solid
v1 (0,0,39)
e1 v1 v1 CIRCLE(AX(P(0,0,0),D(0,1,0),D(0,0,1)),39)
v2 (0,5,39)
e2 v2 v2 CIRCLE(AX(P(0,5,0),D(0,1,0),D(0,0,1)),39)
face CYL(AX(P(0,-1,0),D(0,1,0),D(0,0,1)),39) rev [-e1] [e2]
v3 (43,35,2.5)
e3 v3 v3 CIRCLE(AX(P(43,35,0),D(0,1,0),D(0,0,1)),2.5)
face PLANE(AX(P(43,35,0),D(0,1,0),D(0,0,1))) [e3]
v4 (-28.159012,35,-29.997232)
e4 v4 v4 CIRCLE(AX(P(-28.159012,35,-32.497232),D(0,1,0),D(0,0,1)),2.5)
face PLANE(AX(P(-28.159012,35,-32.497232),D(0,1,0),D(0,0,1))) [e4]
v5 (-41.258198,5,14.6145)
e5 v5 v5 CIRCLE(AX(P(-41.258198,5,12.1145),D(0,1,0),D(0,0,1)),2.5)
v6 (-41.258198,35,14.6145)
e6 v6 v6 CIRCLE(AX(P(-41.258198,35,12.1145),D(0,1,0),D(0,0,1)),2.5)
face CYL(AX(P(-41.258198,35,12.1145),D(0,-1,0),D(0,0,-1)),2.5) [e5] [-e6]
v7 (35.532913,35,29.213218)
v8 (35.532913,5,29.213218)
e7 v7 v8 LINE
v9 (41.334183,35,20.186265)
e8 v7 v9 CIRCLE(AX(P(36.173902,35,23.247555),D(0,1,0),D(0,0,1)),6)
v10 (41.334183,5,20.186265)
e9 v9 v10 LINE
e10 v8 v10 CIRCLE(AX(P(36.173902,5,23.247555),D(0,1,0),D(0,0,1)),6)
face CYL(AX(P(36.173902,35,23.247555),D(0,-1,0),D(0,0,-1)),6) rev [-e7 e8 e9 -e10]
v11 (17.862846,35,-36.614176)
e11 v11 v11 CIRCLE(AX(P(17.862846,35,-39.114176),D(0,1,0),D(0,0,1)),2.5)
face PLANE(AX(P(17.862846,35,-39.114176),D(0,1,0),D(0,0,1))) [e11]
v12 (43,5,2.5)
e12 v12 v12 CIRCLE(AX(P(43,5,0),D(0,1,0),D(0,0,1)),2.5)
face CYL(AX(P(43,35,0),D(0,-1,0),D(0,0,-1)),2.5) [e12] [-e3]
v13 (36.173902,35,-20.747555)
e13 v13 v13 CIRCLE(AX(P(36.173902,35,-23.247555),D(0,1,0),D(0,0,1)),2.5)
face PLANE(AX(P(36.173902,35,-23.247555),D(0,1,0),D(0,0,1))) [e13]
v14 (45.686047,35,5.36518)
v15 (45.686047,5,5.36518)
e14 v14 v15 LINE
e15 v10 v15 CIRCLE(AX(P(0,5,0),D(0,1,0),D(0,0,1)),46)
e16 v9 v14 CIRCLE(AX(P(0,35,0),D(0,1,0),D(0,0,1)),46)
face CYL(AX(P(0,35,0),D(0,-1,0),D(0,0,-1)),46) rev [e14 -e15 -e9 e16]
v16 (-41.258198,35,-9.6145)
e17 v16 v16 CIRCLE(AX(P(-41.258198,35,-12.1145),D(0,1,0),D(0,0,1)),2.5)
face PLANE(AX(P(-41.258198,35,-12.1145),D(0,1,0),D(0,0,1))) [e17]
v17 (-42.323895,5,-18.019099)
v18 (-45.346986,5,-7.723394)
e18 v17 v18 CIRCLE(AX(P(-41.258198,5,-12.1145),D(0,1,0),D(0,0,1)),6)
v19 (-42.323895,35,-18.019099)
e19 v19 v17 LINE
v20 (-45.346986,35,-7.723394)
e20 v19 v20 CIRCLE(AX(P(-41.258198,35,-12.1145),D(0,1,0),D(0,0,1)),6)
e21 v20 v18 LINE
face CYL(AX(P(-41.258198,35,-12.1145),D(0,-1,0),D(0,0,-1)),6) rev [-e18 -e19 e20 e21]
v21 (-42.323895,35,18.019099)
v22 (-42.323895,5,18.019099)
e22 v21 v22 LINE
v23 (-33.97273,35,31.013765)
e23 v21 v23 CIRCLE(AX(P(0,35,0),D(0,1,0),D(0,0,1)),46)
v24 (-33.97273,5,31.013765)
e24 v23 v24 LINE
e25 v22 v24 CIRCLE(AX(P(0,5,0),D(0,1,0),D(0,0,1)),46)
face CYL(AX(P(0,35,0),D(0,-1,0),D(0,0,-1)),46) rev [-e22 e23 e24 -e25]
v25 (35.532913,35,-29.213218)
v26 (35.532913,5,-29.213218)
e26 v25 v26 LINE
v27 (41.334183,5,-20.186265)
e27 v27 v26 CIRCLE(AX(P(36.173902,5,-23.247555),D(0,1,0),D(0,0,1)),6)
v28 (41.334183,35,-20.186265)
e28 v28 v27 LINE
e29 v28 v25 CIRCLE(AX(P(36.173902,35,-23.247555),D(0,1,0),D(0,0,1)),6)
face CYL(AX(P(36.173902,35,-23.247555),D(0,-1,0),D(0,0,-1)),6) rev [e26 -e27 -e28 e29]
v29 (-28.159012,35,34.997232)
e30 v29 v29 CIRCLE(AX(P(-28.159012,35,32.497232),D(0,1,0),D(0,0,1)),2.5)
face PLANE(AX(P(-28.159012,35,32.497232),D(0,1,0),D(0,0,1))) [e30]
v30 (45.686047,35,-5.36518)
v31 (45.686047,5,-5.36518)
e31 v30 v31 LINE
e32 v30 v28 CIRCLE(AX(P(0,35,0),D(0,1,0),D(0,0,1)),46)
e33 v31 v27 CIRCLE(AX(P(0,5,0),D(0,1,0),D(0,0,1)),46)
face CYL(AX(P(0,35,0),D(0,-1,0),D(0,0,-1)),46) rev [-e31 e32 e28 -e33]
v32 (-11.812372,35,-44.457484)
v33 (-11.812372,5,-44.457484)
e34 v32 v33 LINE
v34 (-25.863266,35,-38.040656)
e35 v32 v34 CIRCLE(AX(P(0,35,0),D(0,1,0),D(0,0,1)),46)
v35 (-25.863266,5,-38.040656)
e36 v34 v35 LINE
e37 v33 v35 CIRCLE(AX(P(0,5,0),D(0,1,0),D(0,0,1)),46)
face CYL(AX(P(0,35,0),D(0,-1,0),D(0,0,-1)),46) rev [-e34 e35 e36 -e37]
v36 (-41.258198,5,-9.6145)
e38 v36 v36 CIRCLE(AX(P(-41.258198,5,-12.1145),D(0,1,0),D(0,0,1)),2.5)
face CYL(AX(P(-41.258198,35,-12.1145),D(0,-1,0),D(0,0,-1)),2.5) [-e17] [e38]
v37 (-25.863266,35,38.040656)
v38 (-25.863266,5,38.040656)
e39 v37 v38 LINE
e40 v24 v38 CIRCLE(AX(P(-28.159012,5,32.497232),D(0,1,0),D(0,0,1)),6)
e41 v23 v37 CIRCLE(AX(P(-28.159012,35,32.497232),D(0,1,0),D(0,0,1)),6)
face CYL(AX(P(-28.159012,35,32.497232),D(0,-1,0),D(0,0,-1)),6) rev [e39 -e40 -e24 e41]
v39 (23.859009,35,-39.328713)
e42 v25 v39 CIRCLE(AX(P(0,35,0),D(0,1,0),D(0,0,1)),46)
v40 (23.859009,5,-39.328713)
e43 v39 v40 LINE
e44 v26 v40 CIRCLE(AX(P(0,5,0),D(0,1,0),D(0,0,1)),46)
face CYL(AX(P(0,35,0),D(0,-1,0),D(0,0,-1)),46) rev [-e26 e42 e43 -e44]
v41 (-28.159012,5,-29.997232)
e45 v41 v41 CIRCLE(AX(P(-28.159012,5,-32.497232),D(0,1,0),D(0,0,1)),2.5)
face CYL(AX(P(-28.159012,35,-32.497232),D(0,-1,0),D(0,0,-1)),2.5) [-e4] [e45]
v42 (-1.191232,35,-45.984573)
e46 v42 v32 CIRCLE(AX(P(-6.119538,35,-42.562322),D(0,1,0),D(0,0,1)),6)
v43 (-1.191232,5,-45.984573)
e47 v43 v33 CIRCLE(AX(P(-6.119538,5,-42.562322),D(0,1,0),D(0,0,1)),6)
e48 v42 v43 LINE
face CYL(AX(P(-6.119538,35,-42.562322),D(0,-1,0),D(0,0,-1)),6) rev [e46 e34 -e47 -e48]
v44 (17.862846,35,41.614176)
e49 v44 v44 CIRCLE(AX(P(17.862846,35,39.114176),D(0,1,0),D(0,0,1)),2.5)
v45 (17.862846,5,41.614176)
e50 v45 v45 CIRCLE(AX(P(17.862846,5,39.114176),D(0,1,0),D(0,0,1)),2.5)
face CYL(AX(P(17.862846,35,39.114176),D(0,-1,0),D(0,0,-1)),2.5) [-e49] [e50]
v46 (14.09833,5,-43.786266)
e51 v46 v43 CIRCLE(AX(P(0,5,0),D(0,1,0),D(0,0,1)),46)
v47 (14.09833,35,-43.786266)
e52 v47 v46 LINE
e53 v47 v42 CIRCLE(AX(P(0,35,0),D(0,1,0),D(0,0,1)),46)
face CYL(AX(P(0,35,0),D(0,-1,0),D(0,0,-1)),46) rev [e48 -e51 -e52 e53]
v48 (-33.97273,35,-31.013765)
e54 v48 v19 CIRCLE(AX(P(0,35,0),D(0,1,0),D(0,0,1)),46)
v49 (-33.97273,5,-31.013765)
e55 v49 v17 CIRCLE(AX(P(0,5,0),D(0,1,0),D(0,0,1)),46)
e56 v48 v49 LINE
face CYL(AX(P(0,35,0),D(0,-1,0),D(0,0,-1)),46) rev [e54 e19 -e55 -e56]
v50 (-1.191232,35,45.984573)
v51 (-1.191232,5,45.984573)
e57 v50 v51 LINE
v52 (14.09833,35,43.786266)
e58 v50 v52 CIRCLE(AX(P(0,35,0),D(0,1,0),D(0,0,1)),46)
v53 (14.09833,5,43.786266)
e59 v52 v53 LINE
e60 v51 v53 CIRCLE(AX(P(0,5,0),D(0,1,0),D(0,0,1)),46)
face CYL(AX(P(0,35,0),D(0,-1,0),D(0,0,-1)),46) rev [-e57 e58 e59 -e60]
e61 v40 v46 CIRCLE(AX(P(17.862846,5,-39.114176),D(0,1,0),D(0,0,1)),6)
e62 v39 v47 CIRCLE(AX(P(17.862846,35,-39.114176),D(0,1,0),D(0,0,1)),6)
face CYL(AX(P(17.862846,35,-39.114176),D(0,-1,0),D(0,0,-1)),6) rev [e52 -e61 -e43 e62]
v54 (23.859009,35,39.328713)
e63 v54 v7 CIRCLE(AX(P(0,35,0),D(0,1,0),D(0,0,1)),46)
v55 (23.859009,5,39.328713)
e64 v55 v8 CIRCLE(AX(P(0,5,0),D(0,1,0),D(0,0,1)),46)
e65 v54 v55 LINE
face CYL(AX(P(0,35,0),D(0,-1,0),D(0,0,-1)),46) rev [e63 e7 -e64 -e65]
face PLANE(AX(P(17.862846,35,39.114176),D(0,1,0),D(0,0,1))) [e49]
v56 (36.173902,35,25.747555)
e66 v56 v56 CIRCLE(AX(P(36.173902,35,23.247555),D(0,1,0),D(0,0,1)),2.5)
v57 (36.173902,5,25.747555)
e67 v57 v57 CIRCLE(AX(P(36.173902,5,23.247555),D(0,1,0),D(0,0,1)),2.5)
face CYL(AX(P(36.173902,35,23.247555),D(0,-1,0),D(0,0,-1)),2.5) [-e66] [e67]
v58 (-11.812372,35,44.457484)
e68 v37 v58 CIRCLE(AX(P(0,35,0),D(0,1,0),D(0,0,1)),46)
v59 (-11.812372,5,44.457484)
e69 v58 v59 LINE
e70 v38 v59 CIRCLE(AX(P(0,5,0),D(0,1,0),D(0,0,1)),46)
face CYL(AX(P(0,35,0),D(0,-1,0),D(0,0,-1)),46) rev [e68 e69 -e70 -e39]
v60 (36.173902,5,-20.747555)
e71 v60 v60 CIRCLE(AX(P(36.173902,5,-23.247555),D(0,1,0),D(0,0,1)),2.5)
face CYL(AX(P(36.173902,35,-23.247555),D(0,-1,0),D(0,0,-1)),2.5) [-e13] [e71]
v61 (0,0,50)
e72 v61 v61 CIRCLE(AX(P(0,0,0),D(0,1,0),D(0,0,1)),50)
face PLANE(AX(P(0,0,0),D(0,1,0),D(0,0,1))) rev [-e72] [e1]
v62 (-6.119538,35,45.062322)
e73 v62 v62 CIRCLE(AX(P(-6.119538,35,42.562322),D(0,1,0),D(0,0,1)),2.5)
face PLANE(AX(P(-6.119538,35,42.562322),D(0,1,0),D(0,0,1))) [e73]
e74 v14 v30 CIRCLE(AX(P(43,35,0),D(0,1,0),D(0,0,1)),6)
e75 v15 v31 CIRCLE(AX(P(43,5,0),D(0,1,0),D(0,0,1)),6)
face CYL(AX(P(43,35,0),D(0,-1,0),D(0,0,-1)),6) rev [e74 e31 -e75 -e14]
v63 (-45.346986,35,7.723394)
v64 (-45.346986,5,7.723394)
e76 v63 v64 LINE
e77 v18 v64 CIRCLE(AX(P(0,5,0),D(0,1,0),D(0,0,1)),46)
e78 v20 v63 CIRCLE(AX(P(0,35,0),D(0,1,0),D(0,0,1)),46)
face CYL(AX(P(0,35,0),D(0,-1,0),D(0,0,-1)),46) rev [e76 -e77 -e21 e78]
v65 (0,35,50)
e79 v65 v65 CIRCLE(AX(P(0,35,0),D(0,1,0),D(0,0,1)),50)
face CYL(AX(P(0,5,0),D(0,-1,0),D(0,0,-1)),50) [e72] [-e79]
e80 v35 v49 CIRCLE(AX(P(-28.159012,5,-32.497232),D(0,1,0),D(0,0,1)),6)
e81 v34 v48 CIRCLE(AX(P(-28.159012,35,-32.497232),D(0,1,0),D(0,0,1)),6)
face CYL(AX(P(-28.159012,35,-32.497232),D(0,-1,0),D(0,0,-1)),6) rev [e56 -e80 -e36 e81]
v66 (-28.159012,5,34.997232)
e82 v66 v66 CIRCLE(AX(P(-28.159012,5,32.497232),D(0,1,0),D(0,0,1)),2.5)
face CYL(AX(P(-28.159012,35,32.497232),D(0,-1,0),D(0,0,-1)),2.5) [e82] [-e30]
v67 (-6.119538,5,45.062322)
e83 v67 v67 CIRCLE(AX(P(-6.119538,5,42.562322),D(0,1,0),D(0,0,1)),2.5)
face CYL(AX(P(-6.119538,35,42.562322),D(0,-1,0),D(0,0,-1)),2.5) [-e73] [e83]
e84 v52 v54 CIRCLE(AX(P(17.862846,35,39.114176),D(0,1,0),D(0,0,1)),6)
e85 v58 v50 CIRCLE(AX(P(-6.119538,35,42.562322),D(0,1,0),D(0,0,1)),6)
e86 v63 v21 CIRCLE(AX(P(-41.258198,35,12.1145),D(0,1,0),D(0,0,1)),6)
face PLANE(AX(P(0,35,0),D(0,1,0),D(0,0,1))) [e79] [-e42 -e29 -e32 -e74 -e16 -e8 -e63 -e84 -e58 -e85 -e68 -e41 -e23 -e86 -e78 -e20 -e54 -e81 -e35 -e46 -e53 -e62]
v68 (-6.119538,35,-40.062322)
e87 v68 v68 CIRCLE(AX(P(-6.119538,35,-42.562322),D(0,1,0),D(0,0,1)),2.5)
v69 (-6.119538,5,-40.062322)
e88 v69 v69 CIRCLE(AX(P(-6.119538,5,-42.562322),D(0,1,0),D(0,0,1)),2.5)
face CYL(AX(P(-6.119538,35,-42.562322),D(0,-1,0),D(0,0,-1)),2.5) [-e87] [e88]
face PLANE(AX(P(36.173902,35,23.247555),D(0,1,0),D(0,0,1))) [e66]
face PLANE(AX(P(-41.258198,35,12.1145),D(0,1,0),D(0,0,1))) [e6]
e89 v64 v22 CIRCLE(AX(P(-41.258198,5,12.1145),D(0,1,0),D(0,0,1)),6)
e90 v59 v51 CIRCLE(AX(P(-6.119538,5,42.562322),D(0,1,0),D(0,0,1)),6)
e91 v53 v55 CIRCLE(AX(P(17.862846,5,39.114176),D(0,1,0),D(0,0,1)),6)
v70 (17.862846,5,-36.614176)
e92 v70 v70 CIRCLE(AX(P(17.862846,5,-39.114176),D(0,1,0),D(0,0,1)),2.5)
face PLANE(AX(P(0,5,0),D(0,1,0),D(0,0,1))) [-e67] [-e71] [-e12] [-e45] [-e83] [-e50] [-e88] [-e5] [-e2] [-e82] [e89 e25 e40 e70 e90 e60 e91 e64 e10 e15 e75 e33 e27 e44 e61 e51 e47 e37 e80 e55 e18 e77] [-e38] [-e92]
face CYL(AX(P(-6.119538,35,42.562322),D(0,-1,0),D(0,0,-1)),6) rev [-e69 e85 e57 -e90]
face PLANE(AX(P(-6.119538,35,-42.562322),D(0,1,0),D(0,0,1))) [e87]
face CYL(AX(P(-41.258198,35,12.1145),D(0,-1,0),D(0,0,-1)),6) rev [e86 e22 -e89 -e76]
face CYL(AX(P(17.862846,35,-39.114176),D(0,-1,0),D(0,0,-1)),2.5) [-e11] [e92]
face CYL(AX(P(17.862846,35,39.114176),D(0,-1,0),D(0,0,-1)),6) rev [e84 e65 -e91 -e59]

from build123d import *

# Parameters (mm, degrees)
SKETCH1_R               = 50
BOSS_EXTRUDE1_DEPTH     = 5
SKETCH2_R               = 2.5
BOSS_EXTRUDE2_DEPTH     = 30
BOSS_EXTRUDE3_OUTLINE_R = 50
BOSS_EXTRUDE3_DEPTH     = 30
SKETCH4_R               = 39
CUT_EXTRUDE1_DEPTH      = 6


# Read off the part's stored shape, not the designer's step: Boss-Extrude3
with BuildPart() as part:
    # Sketch1 → Boss-Extrude1 (new body)
    with BuildSketch(Plane(origin=(0, 0, 0), x_dir=(1, 0, 0), z_dir=(0, 1, 0))):
        with Locations(Location((0, 0, 0), (0, 0, 270))):
            Circle(SKETCH1_R)
    extrude(amount=BOSS_EXTRUDE1_DEPTH)

    # Sketch2 → Boss-Extrude2 (add)
    with BuildSketch(Plane(origin=(0, 5, 0), x_dir=(1, 0, 0), z_dir=(0, 1, 0))):
        with Locations(Location((43, 0, 0), (0, 0, 270))):
            Circle(SKETCH2_R)
        with Locations(Location((36.173901912, -23.247555151, 0), (0, 0, 270))):
            Circle(SKETCH2_R)
        with Locations(Location((17.862845559, -39.1141758, 0), (0, 0, 270))):
            Circle(SKETCH2_R)
        with Locations(Location((-6.119538046, -42.562322001, 0), (0, 0, 270))):
            Circle(SKETCH2_R)
        with Locations(Location((-28.15901156, -32.497231697, 0), (0, 0, 270))):
            Circle(SKETCH2_R)
        with Locations(Location((-41.258197865, -12.114499944, 0), (0, 0, 270))):
            Circle(SKETCH2_R)
        with Locations(Location((-41.258197865, 12.114499944, 0), (0, 0, 270))):
            Circle(SKETCH2_R)
        with Locations(Location((-28.15901156, 32.497231697, 0), (0, 0, 270))):
            Circle(SKETCH2_R)
        with Locations(Location((-6.119538046, 42.562322001, 0), (0, 0, 270))):
            Circle(SKETCH2_R)
        with Locations(Location((17.862845559, 39.1141758, 0), (0, 0, 270))):
            Circle(SKETCH2_R)
        with Locations(Location((36.173901912, 23.247555151, 0), (0, 0, 270))):
            Circle(SKETCH2_R)
    extrude(amount=BOSS_EXTRUDE2_DEPTH)

    # Boss-Extrude3 outline → Boss-Extrude3 (add)
    with BuildSketch(Plane(origin=(0, 5, 0), x_dir=(1, 0, 0), z_dir=(0, 1, 0))):
        Circle(BOSS_EXTRUDE3_OUTLINE_R)
        with BuildLine():
            ThreePointArc((45.686046512, 5.365179786), (49, 0), (45.686046512, -5.365179786))
            ThreePointArc((45.686046512, -5.365179786), (44.136676786, -12.959697615), (41.334183214, -20.186265083))
            ThreePointArc((41.334183214, -20.186265083), (41.221423109, -26.491400055), (35.532912844, -29.213217982))
            ThreePointArc((35.532912844, -29.213217982), (30.123593761, -34.76448042), (23.8590088, -39.328713418))
            ThreePointArc((23.8590088, -39.328713418), (20.355335637, -44.571967772), (14.098330411, -43.786265879))
            ThreePointArc((14.098330411, -43.786265879), (6.54648256, -45.531786327), (-1.191232329, -45.984573126))
            ThreePointArc((-1.191232329, -45.984573126), (-6.973427076, -48.501250652), (-11.812372312, -44.457483738))
            ThreePointArc((-11.812372312, -44.457483738), (-19.109090598, -41.843071786), (-25.86326561, -38.040655778))
            ThreePointArc((-25.86326561, -38.040655778), (-32.088175963, -37.031729143), (-33.972730289, -31.013764633))
            ThreePointArc((-33.972730289, -31.013764633), (-38.69766251, -24.869477603), (-42.323894801, -18.019099003))
            ThreePointArc((-42.323894801, -18.019099003), (-47.015155707, -13.804895285), (-45.346986439, -7.723394389))
            ThreePointArc((-45.346986439, -7.723394389), (-46, 0), (-45.346986439, 7.723394389))
            ThreePointArc((-45.346986439, 7.723394389), (-47.015155707, 13.804895285), (-42.323894801, 18.019099003))
            ThreePointArc((-42.323894801, 18.019099003), (-38.69766251, 24.869477603), (-33.972730289, 31.013764633))
            ThreePointArc((-33.972730289, 31.013764633), (-32.088175963, 37.031729143), (-25.86326561, 38.040655778))
            ThreePointArc((-25.86326561, 38.040655778), (-19.109090598, 41.843071786), (-11.812372312, 44.457483738))
            ThreePointArc((-11.812372312, 44.457483738), (-6.973427076, 48.501250652), (-1.191232329, 45.984573126))
            ThreePointArc((-1.191232329, 45.984573126), (6.54648256, 45.531786327), (14.098330411, 43.786265879))
            ThreePointArc((14.098330411, 43.786265879), (20.355335637, 44.571967772), (23.8590088, 39.328713418))
            ThreePointArc((23.8590088, 39.328713418), (30.123593761, 34.76448042), (35.532912844, 29.213217982))
            ThreePointArc((35.532912844, 29.213217982), (41.221423109, 26.491400055), (41.334183214, 20.186265083))
            ThreePointArc((41.334183214, 20.186265083), (44.136676786, 12.959697615), (45.686046512, 5.365179786))
        make_face(mode=Mode.SUBTRACT)
    extrude(amount=BOSS_EXTRUDE3_DEPTH)

    # Sketch4 → Cut-Extrude1 (cut)
    with BuildSketch(Plane(origin=(0, 5, 0), x_dir=(1, 0, 0), z_dir=(0, 1, 0))):
        with Locations(Location((0, 0, 0), (0, 0, 270))):
            Circle(SKETCH4_R)
    extrude(amount=-CUT_EXTRUDE1_DEPTH, mode=Mode.SUBTRACT)


solid = part.part
